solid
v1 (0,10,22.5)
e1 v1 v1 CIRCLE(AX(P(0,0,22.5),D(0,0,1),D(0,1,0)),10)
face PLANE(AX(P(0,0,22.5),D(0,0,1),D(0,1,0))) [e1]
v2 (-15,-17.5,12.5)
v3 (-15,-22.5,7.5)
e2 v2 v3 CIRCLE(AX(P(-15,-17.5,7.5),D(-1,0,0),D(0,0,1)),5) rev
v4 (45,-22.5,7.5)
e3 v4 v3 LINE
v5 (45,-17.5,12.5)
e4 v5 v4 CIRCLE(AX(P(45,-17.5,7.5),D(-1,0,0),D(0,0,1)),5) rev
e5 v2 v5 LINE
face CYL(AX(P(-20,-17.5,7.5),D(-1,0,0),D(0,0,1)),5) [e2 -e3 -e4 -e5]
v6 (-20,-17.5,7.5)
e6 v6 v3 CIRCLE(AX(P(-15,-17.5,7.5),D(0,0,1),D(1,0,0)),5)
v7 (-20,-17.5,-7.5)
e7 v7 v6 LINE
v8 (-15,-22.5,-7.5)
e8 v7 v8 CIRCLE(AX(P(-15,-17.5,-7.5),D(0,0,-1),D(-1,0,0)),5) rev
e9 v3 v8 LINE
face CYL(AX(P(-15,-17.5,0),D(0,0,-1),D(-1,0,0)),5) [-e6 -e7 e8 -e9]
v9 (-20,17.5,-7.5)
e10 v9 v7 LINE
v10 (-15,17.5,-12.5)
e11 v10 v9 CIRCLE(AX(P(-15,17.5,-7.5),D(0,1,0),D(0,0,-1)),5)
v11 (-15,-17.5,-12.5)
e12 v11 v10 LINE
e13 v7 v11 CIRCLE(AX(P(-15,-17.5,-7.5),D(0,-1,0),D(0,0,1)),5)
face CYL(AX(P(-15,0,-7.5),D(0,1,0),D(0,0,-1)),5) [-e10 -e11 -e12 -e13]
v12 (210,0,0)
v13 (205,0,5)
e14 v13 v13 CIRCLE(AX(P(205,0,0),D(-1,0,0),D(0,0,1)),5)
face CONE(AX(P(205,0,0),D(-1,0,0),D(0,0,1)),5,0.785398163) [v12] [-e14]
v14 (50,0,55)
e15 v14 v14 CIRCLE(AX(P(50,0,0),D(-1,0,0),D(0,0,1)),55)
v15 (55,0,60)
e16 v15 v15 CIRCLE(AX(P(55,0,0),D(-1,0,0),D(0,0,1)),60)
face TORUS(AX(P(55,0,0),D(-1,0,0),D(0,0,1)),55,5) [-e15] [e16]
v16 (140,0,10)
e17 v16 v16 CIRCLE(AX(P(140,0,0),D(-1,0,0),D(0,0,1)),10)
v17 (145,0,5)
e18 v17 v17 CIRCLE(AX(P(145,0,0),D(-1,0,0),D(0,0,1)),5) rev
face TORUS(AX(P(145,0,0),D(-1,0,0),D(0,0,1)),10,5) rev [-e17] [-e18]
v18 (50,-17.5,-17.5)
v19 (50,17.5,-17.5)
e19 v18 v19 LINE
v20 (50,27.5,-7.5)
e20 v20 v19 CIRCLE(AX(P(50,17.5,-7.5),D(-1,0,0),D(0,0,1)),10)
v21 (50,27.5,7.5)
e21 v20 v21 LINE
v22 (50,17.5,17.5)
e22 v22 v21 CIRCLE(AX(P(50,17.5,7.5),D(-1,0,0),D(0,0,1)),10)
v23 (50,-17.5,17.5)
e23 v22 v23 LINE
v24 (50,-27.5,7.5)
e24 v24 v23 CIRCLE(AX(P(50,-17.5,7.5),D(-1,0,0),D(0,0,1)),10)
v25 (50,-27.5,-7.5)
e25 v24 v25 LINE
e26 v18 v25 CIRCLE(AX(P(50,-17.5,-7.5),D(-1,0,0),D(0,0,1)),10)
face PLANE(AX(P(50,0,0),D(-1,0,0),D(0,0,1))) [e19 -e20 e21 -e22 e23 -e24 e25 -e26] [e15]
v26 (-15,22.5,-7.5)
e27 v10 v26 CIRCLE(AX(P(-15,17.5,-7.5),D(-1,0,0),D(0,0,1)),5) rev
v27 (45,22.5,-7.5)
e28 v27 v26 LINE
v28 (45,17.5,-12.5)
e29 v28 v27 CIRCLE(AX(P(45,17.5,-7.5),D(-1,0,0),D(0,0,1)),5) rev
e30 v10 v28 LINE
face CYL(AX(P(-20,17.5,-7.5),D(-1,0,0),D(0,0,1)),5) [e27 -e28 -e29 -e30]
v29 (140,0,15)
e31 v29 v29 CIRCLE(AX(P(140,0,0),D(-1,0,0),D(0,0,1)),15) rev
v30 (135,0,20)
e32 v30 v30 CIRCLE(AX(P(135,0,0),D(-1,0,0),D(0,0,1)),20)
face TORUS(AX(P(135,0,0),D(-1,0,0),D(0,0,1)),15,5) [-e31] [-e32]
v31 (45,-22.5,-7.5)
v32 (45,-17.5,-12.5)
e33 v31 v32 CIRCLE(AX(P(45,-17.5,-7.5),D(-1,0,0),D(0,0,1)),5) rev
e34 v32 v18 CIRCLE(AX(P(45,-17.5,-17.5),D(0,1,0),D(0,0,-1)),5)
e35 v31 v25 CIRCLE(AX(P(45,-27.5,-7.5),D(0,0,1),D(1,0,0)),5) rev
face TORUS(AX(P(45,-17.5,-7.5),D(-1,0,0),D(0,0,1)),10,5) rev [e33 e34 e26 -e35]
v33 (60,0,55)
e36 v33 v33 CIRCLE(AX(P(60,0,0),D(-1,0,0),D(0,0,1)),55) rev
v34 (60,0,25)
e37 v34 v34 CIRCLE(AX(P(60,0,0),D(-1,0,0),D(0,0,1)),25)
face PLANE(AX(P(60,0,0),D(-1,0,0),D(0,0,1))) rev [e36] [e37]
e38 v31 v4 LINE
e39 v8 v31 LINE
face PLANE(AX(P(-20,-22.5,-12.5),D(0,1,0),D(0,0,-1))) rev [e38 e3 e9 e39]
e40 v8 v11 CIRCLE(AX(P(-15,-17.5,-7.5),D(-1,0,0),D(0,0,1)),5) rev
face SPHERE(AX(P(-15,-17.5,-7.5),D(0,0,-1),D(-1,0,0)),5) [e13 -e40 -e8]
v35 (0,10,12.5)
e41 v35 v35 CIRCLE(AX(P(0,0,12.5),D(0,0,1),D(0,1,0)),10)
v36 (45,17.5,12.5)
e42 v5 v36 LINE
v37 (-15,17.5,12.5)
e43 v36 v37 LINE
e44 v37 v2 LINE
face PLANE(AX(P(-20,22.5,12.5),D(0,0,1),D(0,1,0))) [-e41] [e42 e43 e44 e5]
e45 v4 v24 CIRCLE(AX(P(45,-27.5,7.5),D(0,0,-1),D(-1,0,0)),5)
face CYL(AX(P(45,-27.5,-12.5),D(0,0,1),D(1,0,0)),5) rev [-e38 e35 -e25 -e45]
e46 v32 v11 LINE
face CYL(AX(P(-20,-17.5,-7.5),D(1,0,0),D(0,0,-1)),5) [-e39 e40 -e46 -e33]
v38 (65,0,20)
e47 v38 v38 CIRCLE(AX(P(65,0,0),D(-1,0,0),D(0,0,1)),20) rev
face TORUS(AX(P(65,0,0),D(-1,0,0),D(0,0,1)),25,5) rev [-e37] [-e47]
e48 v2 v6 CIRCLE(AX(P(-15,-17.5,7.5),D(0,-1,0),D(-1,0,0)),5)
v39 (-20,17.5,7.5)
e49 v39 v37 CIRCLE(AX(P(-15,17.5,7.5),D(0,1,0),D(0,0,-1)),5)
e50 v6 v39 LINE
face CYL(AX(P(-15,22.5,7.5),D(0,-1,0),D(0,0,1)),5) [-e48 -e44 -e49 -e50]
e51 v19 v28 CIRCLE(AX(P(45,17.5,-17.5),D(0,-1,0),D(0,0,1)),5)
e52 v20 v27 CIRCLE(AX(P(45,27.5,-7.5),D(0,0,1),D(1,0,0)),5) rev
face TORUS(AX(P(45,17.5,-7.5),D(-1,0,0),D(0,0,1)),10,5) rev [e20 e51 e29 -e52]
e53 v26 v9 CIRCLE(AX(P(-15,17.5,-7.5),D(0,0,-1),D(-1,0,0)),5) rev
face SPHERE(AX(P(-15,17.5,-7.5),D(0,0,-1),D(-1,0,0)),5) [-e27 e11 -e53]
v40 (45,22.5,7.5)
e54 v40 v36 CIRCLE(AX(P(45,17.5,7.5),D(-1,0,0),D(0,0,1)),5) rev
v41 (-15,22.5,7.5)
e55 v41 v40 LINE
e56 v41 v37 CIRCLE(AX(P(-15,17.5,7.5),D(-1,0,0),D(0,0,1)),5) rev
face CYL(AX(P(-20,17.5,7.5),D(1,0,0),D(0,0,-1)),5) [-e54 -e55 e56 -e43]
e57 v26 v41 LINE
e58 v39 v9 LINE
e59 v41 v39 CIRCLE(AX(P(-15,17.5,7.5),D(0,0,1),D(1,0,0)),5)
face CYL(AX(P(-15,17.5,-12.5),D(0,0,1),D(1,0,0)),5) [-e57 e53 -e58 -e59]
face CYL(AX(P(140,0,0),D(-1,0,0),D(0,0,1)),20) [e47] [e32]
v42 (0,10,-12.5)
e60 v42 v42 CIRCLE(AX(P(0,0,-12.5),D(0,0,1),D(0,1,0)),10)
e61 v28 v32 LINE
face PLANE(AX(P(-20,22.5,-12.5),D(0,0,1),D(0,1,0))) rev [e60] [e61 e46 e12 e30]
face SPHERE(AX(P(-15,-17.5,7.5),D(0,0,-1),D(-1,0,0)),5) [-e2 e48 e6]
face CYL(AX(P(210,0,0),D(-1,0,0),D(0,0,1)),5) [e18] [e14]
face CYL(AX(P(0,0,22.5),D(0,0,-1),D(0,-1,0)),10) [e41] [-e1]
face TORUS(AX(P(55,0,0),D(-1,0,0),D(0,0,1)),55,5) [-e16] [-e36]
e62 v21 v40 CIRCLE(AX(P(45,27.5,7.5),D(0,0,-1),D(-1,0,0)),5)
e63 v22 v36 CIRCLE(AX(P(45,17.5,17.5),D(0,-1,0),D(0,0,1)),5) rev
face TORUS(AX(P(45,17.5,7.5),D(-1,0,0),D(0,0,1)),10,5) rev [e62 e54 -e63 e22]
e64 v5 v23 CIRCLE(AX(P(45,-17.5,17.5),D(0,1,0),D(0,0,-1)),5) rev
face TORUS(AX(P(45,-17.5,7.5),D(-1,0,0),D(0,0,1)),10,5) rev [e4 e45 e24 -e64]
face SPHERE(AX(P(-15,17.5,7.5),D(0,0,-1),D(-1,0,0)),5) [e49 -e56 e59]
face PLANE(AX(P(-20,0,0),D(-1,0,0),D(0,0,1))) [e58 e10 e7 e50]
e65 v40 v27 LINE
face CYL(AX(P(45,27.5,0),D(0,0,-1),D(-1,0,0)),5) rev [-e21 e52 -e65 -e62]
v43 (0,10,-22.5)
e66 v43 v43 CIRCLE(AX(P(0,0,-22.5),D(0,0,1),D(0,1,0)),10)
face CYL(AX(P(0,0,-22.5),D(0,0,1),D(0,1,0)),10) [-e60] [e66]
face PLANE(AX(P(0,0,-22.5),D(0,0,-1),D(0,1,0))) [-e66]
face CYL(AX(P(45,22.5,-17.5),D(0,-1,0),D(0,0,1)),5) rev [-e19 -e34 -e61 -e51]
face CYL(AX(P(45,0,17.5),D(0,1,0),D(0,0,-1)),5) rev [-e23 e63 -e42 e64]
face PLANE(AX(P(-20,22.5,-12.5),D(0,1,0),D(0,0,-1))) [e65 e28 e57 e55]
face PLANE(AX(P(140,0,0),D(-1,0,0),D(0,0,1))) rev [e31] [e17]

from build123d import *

# Parameters (mm, degrees)
SKETCH1_R             = 60
SKETCH1_W             = 25
SKETCH1_H             = 45
BOSS_EXTRUDE1_DEPTH   = 10
SKETCH1_3_R           = 20
BOSS_EXTRUDE2_DEPTH   = 80
BOSS_EXTRUDE3_START   = -80
SKETCH1_4_R           = 5
BOSS_EXTRUDE3_DEPTH   = 70
CHAMFER1_SIZE         = 5
SKETCH1_5_W           = 25
SKETCH1_5_H           = 45
BOSS_EXTRUDE4_DEPTH   = 80
SKETCH3_R             = 10
BOSS_EXTRUDE5_DEPTH   = 10
FILLET1_R             = 5
BODY_MOVE_COPY4_ANGLE = 180


with BuildPart() as part:
    # Sketch1 → Boss-Extrude1 (new body)
    with BuildSketch(Plane(origin=(0, 0, 0), x_dir=(0, 0, -1), z_dir=(1, 0, 0))):
        Circle(SKETCH1_R)
        Rectangle(SKETCH1_W, SKETCH1_H, mode=Mode.SUBTRACT)
    extrude(amount=BOSS_EXTRUDE1_DEPTH)

    # Sketch1<3> → Boss-Extrude2 (add)
    with BuildSketch(Plane(origin=(0, 0, 0), x_dir=(0, 0, -1), z_dir=(1, 0, 0))):
        Circle(SKETCH1_3_R)
    extrude(amount=-BOSS_EXTRUDE2_DEPTH)

    # Sketch1<4> → Boss-Extrude3 (add)
    with BuildSketch(Plane(origin=(0, 0, 0), x_dir=(0, 0, -1), z_dir=(1, 0, 0)).offset(BOSS_EXTRUDE3_START)):
        Circle(SKETCH1_4_R)
    extrude(amount=-BOSS_EXTRUDE3_DEPTH)

    # Chamfer1
    chamfer1_edges = [part.edges().sort_by_distance(p)[0] for p in [
        (-150, 0, 5),
    ]]
    chamfer(chamfer1_edges, length=CHAMFER1_SIZE)

    # Sketch1<5> → Boss-Extrude4 (add)
    with BuildSketch(Plane(origin=(0, 0, 0), x_dir=(0, 0, -1), z_dir=(1, 0, 0))):
        Rectangle(SKETCH1_5_W, SKETCH1_5_H)
    extrude(amount=BOSS_EXTRUDE4_DEPTH)

    # Sketch3 → Boss-Extrude5 (add)
    with BuildSketch(Plane(origin=(0, 0, -12.5), x_dir=(-1, 0, 0), z_dir=(0, 0, -1))):
        with Locations(Location((-60, 0, 0), (0, 0, 90))):
            Circle(SKETCH3_R)
    boss_extrude5 = extrude(amount=BOSS_EXTRUDE5_DEPTH)

    # Mirror1: Boss-Extrude5 across plane
    add(boss_extrude5.mirror(Plane.XY))

    # Fillet1
    fillet1_edges = [part.edges().sort_by_distance(p)[0] for p in [
        (10, 22.5, 0),
        (10, 0, -12.5),
        (0, 0, 20),
        (-80, 0, 20),
        (10, 0, 60),
        (-80, 0, 5),
        (45, 22.5, 12.5),
        (45, -22.5, 12.5),
        (45, -22.5, -12.5),
        (80, 0, -12.5),
        (45, 22.5, -12.5),
        (80, 22.5, 0),
        (80, 0, 12.5),
        (80, -22.5, 0),
        (10, -22.5, 0),
        (0, 0, 60),
        (10, 0, 12.5),
    ]]
    fillet(fillet1_edges, radius=FILLET1_R - 0.0001)  # a hair under: the kernel refuses the full size


with BuildPart() as part_1:
    # Body-Move/Copy1: moved
    add(part.part.moved(Location((150, 0, 0))))


with BuildPart() as part_2:
    # Body-Move/Copy4: moved
    add(part_1.part.rotate(Axis((0, 0, 0), (0, 1, 0)), BODY_MOVE_COPY4_ANGLE))


with BuildPart() as part_3:
    # Body-Move/Copy5: moved
    add(part_2.part.moved(Location((210, 0, 0))))


solid = part_3.part
